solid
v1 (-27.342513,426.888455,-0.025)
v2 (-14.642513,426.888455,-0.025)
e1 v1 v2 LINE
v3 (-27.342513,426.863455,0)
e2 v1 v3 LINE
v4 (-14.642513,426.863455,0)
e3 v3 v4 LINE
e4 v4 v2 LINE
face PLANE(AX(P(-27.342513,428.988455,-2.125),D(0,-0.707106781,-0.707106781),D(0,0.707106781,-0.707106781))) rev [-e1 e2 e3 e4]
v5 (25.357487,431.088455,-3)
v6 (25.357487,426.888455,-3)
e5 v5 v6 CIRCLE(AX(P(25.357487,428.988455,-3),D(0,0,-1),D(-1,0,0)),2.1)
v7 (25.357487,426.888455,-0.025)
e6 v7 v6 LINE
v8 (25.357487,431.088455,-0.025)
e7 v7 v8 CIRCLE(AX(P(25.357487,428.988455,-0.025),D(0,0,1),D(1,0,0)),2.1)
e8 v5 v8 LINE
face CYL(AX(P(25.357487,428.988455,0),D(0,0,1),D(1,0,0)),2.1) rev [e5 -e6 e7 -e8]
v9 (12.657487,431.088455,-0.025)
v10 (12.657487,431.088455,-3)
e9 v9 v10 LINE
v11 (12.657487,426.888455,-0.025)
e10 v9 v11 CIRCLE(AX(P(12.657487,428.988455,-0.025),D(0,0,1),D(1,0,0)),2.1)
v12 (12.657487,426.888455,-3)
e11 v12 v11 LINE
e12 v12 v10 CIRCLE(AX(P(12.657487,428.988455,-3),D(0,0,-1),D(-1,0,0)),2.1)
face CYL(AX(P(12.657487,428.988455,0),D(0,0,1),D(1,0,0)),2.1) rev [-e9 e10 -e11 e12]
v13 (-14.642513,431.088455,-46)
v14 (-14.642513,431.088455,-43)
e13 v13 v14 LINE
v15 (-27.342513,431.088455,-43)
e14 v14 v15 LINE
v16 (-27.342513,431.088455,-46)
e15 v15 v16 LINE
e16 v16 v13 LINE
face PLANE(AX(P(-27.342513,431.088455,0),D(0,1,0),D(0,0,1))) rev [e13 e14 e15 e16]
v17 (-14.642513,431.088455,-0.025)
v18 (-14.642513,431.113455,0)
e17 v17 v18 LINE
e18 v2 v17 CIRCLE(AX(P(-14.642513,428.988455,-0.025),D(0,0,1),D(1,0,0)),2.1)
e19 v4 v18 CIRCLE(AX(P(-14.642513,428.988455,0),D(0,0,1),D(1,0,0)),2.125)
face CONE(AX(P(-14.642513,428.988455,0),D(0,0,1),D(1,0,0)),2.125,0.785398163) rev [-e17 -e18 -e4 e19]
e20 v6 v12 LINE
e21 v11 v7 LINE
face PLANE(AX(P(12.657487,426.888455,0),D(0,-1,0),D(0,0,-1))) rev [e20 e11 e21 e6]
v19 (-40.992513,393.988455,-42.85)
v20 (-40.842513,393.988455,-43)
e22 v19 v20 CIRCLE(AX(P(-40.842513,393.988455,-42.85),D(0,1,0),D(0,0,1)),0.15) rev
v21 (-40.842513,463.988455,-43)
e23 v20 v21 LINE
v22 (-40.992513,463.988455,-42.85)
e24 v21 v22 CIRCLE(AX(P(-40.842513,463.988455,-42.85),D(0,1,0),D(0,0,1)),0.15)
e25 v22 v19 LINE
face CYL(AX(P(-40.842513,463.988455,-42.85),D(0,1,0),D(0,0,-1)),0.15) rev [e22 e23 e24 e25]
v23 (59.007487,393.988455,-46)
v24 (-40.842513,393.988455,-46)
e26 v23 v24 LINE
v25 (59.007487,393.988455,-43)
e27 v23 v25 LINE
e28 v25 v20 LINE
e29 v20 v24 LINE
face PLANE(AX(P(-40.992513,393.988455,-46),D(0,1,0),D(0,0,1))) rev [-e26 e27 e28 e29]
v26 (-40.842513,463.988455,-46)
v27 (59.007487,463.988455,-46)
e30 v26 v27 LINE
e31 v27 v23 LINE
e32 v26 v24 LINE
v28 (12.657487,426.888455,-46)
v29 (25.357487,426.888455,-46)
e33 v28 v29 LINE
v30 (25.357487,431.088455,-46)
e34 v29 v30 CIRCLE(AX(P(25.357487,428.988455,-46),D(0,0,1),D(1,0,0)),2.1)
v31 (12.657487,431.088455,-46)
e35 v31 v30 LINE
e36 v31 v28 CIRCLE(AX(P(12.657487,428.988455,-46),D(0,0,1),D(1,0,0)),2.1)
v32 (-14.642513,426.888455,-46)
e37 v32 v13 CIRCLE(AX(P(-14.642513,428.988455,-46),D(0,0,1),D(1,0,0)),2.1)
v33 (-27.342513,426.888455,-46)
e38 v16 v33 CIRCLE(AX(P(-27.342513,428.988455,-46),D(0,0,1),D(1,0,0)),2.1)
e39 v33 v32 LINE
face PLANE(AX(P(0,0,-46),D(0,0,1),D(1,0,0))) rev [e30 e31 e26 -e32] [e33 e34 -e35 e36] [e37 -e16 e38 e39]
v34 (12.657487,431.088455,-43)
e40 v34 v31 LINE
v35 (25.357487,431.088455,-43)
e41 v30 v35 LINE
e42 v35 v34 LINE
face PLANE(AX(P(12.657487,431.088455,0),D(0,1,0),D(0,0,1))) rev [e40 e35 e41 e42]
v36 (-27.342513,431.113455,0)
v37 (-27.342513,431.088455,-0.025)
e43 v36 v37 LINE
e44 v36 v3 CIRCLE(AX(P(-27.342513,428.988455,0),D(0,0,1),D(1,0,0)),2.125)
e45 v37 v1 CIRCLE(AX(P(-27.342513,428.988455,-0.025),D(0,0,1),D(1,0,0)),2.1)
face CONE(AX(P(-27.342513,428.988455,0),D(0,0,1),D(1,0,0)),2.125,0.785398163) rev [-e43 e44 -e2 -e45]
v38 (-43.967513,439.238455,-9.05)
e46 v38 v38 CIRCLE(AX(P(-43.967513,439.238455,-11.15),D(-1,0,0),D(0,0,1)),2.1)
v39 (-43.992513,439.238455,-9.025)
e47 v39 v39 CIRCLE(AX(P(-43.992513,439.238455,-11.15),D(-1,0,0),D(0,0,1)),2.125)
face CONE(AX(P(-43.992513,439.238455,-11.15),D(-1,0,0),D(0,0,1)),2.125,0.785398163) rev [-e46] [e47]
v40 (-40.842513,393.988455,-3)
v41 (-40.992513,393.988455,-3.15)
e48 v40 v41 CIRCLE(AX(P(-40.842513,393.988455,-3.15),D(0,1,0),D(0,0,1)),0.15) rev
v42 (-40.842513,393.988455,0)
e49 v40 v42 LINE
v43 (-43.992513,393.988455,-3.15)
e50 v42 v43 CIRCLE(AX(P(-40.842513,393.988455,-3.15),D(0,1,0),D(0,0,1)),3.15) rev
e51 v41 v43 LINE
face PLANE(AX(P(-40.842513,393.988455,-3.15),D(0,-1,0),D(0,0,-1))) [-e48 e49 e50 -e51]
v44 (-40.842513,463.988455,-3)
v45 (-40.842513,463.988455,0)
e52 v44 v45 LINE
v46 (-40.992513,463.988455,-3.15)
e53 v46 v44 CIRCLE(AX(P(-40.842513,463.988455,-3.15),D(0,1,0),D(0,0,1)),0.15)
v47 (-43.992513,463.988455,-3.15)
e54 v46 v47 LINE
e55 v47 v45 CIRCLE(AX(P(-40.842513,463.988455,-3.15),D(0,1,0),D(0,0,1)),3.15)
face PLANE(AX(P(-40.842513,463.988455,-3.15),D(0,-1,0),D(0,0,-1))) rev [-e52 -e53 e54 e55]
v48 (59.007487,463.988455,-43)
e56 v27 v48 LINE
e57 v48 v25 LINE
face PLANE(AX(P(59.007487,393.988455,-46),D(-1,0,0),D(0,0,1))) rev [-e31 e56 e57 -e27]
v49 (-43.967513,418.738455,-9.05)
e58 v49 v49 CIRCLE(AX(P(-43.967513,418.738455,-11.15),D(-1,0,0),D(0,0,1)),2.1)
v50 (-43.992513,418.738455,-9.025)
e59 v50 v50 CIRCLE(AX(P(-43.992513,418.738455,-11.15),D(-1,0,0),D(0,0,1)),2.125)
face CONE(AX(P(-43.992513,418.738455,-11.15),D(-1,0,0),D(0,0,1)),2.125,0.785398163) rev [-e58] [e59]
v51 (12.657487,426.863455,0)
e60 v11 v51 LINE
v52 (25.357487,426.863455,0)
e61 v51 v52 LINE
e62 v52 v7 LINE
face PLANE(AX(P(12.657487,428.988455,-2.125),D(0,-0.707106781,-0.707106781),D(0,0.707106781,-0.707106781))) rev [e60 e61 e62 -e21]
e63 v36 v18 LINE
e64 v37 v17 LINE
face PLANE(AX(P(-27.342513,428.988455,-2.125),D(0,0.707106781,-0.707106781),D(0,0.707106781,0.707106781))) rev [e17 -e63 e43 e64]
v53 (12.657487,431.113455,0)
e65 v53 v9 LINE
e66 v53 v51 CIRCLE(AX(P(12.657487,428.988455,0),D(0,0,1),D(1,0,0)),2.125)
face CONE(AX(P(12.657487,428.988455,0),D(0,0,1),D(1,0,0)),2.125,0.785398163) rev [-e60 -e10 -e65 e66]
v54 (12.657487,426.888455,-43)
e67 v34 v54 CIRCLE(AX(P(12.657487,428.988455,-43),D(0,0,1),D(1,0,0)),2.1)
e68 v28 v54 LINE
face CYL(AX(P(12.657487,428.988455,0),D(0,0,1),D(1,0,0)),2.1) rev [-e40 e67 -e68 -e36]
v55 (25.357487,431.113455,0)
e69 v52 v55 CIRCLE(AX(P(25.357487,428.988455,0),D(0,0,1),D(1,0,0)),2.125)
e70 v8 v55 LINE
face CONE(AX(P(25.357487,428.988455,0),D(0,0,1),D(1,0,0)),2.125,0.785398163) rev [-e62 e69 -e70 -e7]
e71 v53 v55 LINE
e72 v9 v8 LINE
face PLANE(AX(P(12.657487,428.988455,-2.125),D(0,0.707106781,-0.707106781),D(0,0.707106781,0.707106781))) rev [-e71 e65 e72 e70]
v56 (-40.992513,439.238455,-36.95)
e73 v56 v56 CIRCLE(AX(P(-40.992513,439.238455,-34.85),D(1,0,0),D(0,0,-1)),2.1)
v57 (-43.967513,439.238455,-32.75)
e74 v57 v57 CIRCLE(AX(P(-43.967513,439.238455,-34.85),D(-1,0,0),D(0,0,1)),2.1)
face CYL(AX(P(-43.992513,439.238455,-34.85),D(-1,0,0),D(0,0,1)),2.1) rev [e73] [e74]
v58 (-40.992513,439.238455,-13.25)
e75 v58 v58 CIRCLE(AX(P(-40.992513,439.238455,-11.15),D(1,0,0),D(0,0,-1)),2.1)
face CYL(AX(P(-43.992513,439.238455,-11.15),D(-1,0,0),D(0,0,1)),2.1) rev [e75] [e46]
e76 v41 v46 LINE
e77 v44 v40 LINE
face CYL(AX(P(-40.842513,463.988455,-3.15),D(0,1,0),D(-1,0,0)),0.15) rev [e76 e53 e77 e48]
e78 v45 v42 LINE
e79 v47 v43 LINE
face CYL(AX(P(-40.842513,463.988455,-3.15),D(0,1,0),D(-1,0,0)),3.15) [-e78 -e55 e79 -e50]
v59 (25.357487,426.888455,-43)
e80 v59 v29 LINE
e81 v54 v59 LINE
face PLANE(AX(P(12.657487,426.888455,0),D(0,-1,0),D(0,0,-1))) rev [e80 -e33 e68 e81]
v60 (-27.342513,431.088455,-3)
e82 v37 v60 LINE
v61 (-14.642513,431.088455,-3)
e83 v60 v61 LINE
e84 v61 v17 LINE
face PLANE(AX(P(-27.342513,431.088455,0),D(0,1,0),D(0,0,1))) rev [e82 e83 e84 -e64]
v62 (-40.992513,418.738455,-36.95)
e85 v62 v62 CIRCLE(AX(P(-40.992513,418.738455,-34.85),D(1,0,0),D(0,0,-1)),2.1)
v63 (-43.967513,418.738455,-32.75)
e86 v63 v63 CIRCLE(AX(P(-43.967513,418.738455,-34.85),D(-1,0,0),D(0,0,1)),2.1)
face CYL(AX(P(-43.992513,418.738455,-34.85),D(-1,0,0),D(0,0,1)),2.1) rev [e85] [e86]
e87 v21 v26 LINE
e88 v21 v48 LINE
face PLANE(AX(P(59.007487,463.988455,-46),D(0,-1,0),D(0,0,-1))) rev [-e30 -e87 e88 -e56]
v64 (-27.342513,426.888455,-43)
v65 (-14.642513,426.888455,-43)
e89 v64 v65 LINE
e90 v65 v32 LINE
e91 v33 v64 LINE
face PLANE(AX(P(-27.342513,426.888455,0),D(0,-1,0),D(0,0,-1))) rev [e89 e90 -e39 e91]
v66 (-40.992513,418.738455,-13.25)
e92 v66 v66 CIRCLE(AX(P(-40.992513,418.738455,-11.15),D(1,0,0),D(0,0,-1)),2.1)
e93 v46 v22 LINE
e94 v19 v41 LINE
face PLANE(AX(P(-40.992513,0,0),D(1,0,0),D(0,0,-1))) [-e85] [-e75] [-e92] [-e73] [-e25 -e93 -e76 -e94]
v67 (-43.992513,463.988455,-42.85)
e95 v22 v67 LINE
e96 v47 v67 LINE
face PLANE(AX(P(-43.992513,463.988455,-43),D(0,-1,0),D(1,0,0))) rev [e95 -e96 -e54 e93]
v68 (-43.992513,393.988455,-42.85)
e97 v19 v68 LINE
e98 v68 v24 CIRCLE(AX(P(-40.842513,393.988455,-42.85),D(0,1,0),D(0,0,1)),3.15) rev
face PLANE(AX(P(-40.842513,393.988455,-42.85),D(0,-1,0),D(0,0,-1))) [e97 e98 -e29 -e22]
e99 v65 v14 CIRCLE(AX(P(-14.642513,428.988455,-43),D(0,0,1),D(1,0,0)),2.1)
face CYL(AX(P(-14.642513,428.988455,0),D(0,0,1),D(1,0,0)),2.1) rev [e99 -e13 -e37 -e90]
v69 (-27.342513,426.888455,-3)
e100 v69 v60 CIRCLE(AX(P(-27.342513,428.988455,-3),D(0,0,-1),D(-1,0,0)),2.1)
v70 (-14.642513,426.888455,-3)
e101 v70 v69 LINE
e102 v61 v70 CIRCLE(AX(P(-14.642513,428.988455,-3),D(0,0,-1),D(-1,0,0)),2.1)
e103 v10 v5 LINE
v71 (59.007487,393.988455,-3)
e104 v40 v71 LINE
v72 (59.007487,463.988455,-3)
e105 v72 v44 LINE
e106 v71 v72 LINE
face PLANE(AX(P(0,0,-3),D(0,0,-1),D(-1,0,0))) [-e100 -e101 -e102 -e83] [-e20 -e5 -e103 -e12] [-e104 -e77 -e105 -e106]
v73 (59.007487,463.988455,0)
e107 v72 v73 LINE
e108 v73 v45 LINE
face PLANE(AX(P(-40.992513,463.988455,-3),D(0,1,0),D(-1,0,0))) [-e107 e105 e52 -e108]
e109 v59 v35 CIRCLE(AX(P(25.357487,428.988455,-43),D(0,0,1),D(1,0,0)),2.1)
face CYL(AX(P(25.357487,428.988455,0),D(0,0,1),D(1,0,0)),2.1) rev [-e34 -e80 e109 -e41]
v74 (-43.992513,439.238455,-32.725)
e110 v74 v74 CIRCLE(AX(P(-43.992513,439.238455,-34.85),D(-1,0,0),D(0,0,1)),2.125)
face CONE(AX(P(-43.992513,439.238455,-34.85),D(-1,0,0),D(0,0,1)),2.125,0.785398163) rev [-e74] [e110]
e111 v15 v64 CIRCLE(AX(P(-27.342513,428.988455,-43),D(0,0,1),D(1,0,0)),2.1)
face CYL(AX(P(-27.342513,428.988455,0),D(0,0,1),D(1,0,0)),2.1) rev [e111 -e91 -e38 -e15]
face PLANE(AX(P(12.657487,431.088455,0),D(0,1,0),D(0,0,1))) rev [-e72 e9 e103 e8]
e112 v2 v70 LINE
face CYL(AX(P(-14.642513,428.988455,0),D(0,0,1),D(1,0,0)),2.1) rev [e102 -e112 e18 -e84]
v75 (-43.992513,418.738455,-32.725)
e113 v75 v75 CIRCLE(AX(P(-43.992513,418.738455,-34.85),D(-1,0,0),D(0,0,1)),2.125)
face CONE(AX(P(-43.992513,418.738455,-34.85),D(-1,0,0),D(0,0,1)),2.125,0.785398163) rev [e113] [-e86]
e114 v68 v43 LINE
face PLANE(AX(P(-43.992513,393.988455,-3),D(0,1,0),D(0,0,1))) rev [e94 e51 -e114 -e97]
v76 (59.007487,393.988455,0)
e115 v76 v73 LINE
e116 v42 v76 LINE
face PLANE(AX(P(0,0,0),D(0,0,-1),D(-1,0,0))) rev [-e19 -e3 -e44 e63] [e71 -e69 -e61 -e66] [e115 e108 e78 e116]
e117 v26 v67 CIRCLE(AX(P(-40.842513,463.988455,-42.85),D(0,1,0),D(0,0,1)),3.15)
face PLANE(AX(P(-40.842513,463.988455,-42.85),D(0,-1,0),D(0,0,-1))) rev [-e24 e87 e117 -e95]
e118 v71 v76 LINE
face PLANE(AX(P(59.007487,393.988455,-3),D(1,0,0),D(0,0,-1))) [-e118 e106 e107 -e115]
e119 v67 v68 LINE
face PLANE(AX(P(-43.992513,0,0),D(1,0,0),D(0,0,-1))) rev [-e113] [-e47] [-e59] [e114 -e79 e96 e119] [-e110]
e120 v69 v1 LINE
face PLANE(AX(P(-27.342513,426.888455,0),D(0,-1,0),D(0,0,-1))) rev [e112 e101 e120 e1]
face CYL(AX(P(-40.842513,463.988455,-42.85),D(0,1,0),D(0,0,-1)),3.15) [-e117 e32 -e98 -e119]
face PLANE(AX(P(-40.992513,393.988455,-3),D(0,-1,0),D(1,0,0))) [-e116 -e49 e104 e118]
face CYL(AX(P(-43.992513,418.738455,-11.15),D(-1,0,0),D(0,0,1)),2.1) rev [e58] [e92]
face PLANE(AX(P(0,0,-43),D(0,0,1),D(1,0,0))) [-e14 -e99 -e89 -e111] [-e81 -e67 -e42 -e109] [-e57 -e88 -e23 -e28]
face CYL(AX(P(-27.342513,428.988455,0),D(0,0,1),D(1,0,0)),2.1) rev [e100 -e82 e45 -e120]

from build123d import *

# Parameters (mm, degrees)
SKETCH1_W                         = 100
SKETCH1_H                         = 70
BASE_FLANGE1_DEPTH                = 3
EDGE_FLANGE1_STRIP_W              = 12.3
EDGE_FLANGE1_STRIP_H              = 3
EDGE_FLANGE1_STRIP_CUT_DEPTH      = 70
EDGE_FLANGE1_DEPTH                = 70
EDGE_FLANGE3_STRIP_W              = 12.3
EDGE_FLANGE3_STRIP_H              = 3
EDGE_FLANGE3_STRIP_CUT_DEPTH      = 70
EDGE_FLANGE3_DEPTH                = 70
TAP_START                         = -47
TAP_DRILL_SLOT_FOR_M5_TAP3_DEPTH  = 48
TAP_DRILL_FOR_M5_TAP1_D           = 4.2
TAP_DRILL_FOR_M5_TAP1_CSINK_D     = 4.25
TAP_DRILL_FOR_M5_TAP1_CSINK_ANGLE = 90


with BuildPart() as part:
    # Base-Flange1: sheet metal written as solids
    # Sketch1 → Base-Flange1 (new body)
    with BuildSketch(Plane.XY):
        with Locations((9.007487246, 428.98845549)):
            Rectangle(SKETCH1_W, SKETCH1_H)
    extrude(amount=-BASE_FLANGE1_DEPTH)

    # Edge-Flange1: sheet metal written as solids
    # Edge-Flange1 strip (on a plane across the edge) → Edge-Flange1 strip cut (cut)
    with BuildSketch(Plane(origin=(-40.992512754, 393.98845549, -3), x_dir=(1, 0, 0), z_dir=(0, 1, 0))):
        with Locations((-6, -1.5)):
            Rectangle(EDGE_FLANGE1_STRIP_W, EDGE_FLANGE1_STRIP_H)
    extrude(amount=EDGE_FLANGE1_STRIP_CUT_DEPTH, mode=Mode.SUBTRACT)

    # Edge-Flange1 section (on a plane across the edge) → Edge-Flange1 (add)
    with BuildSketch(Plane(origin=(-40.992512754, 393.98845549, -3), x_dir=(1, 0, 0), z_dir=(0, 1, 0))):
        with BuildLine():
            Line((-3, 0.15), (-3, 40))
            Line((-3, 40), (0, 40))
            Line((0, 40), (0, 0.15))
            ThreePointArc((0, 0.15), (0.043933983, 0.043933983), (0.15, 0))
            Line((0.15, 0), (0.15, -3))
            ThreePointArc((0.15, -3), (-2.077386361, -2.077386361), (-3, 0.15))
        make_face()
    extrude(amount=EDGE_FLANGE1_DEPTH)

    # Edge-Flange3: sheet metal written as solids
    # Edge-Flange3 strip (on a plane across the edge) → Edge-Flange3 strip cut (cut)
    with BuildSketch(Plane(origin=(-40.992512754, 393.98845549, -43), x_dir=(0, 0, 1), z_dir=(0, 1, 0))):
        with Locations((-6, -1.5)):
            Rectangle(EDGE_FLANGE3_STRIP_W, EDGE_FLANGE3_STRIP_H)
    extrude(amount=EDGE_FLANGE3_STRIP_CUT_DEPTH, mode=Mode.SUBTRACT)

    # Edge-Flange3 section (on a plane across the edge) → Edge-Flange3 (add)
    with BuildSketch(Plane(origin=(-40.992512754, 393.98845549, -43), x_dir=(0, 0, 1), z_dir=(0, 1, 0))):
        with BuildLine():
            Line((-3, 0.15), (-3, 100))
            Line((-3, 100), (0, 100))
            Line((0, 100), (0, 0.15))
            ThreePointArc((0, 0.15), (0.043933983, 0.043933983), (0.15, 0))
            Line((0.15, 0), (0.15, -3))
            ThreePointArc((0.15, -3), (-2.077386361, -2.077386361), (-3, 0.15))
        make_face()
    extrude(amount=EDGE_FLANGE3_DEPTH)

    # Tap Drill Slot for M5 Tap3: read off the stored shape, not the designer's step
    # Tap Drill Slot for M5 Tap3 outline → Tap Drill Slot for M5 Tap3 (cut)
    with BuildSketch(Plane.XY.offset(TAP_START)):
        with BuildLine():
            ThreePointArc((12.657487246, 431.08845549), (10.557487246, 428.98845549), (12.657487246, 426.88845549))
            Line((12.657487246, 426.88845549), (25.357487246, 426.88845549))
            ThreePointArc((25.357487246, 426.88845549), (27.457487246, 428.98845549), (25.357487246, 431.08845549))
            Line((25.357487246, 431.08845549), (12.657487246, 431.08845549))
        make_face()
        with BuildLine():
            ThreePointArc((-27.342512754, 431.08845549), (-29.442512754, 428.98845549), (-27.342512754, 426.88845549))
            Line((-27.342512754, 426.88845549), (-14.642512754, 426.88845549))
            ThreePointArc((-14.642512754, 426.88845549), (-12.542512754, 428.98845549), (-14.642512754, 431.08845549))
            Line((-14.642512754, 431.08845549), (-27.342512754, 431.08845549))
        make_face()
    extrude(amount=TAP_DRILL_SLOT_FOR_M5_TAP3_DEPTH, mode=Mode.SUBTRACT)

    # Tap Drill Slot for M5 Tap3 2: loft between two sections, ruled curve by curve
    tap_drill_slot_for_m5_tap3_2_from = [
        Edge.make_three_point_arc((25.357487246, 426.88845549, -0.025), (26.842411487, 427.503531249, -0.025), (27.457487246, 428.98845549, -0.025)),
        Edge.make_three_point_arc((27.457487246, 428.98845549, -0.025), (26.842411487, 430.47337973, -0.025), (25.357487246, 431.08845549, -0.025)),
        Edge.make_three_point_arc((12.657487246, 431.08845549, -0.025), (11.172563006, 430.47337973, -0.025), (10.557487246, 428.98845549, -0.025)),
        Edge.make_three_point_arc((10.557487246, 428.98845549, -0.025), (11.172563006, 427.503531249, -0.025), (12.657487246, 426.88845549, -0.025)),
        Edge.make_line((25.357487246, 431.08845549, -0.025), (12.657487246, 431.08845549, -0.025)),
        Edge.make_line((25.357487246, 426.88845549, -0.025), (12.657487246, 426.88845549, -0.025)),
    ]
    tap_drill_slot_for_m5_tap3_2_to = [
        Edge.make_three_point_arc((25.357487246, 426.86345549, 0), (26.860089156, 427.48585358, 0), (27.482487246, 428.98845549, 0)),
        Edge.make_three_point_arc((27.482487246, 428.98845549, 0), (26.860089156, 430.4910574, 0), (25.357487246, 431.11345549, 0)),
        Edge.make_three_point_arc((12.657487246, 431.11345549, 0), (11.154885336, 430.4910574, 0), (10.532487246, 428.98845549, 0)),
        Edge.make_three_point_arc((10.532487246, 428.98845549, 0), (11.154885336, 427.48585358, 0), (12.657487246, 426.86345549, 0)),
        Edge.make_line((25.357487246, 431.11345549, 0), (12.657487246, 431.11345549, 0)),
        Edge.make_line((25.357487246, 426.86345549, 0), (12.657487246, 426.86345549, 0)),
    ]
    tap_drill_slot_for_m5_tap3_2 = Solid(Shell([*[Face.make_surface_from_curves(tap_drill_slot_for_m5_tap3_2_from[k], tap_drill_slot_for_m5_tap3_2_to[k]) for k in range(6)], Face(Wire(tap_drill_slot_for_m5_tap3_2_from)), Face(Wire(tap_drill_slot_for_m5_tap3_2_to))]))
    add(tap_drill_slot_for_m5_tap3_2, mode=Mode.SUBTRACT)

    # Tap Drill Slot for M5 Tap3 3: loft between two sections, ruled curve by curve
    tap_drill_slot_for_m5_tap3_3_from = [
        Edge.make_three_point_arc((-14.642512754, 426.88845549, -0.025), (-13.157588513, 427.503531249, -0.025), (-12.542512754, 428.98845549, -0.025)),
        Edge.make_three_point_arc((-12.542512754, 428.98845549, -0.025), (-13.157588513, 430.47337973, -0.025), (-14.642512754, 431.08845549, -0.025)),
        Edge.make_three_point_arc((-27.342512754, 431.08845549, -0.025), (-28.827436994, 430.47337973, -0.025), (-29.442512754, 428.98845549, -0.025)),
        Edge.make_three_point_arc((-29.442512754, 428.98845549, -0.025), (-28.827436994, 427.503531249, -0.025), (-27.342512754, 426.88845549, -0.025)),
        Edge.make_line((-14.642512754, 431.08845549, -0.025), (-27.342512754, 431.08845549, -0.025)),
        Edge.make_line((-14.642512754, 426.88845549, -0.025), (-27.342512754, 426.88845549, -0.025)),
    ]
    tap_drill_slot_for_m5_tap3_3_to = [
        Edge.make_three_point_arc((-14.642512754, 426.86345549, 0), (-13.139910844, 427.48585358, 0), (-12.517512754, 428.98845549, 0)),
        Edge.make_three_point_arc((-12.517512754, 428.98845549, 0), (-13.139910844, 430.4910574, 0), (-14.642512754, 431.11345549, 0)),
        Edge.make_three_point_arc((-27.342512754, 431.11345549, 0), (-28.845114664, 430.4910574, 0), (-29.467512754, 428.98845549, 0)),
        Edge.make_three_point_arc((-29.467512754, 428.98845549, 0), (-28.845114664, 427.48585358, 0), (-27.342512754, 426.86345549, 0)),
        Edge.make_line((-14.642512754, 431.11345549, 0), (-27.342512754, 431.11345549, 0)),
        Edge.make_line((-14.642512754, 426.86345549, 0), (-27.342512754, 426.86345549, 0)),
    ]
    tap_drill_slot_for_m5_tap3_3 = Solid(Shell([*[Face.make_surface_from_curves(tap_drill_slot_for_m5_tap3_3_from[k], tap_drill_slot_for_m5_tap3_3_to[k]) for k in range(6)], Face(Wire(tap_drill_slot_for_m5_tap3_3_from)), Face(Wire(tap_drill_slot_for_m5_tap3_3_to))]))
    add(tap_drill_slot_for_m5_tap3_3, mode=Mode.SUBTRACT)

    # Tap Drill for M5 Tap1 (through all)
    with Locations(Plane.ZY.offset(43.992512754)):
        with Locations((-34.85, 439.23845549), (-11.15, 439.23845549), (-11.15, 418.73845549), (-34.85, 418.73845549)):
            CounterSinkHole(TAP_DRILL_FOR_M5_TAP1_D / 2, TAP_DRILL_FOR_M5_TAP1_CSINK_D / 2, counter_sink_angle=TAP_DRILL_FOR_M5_TAP1_CSINK_ANGLE)


solid = part.part
